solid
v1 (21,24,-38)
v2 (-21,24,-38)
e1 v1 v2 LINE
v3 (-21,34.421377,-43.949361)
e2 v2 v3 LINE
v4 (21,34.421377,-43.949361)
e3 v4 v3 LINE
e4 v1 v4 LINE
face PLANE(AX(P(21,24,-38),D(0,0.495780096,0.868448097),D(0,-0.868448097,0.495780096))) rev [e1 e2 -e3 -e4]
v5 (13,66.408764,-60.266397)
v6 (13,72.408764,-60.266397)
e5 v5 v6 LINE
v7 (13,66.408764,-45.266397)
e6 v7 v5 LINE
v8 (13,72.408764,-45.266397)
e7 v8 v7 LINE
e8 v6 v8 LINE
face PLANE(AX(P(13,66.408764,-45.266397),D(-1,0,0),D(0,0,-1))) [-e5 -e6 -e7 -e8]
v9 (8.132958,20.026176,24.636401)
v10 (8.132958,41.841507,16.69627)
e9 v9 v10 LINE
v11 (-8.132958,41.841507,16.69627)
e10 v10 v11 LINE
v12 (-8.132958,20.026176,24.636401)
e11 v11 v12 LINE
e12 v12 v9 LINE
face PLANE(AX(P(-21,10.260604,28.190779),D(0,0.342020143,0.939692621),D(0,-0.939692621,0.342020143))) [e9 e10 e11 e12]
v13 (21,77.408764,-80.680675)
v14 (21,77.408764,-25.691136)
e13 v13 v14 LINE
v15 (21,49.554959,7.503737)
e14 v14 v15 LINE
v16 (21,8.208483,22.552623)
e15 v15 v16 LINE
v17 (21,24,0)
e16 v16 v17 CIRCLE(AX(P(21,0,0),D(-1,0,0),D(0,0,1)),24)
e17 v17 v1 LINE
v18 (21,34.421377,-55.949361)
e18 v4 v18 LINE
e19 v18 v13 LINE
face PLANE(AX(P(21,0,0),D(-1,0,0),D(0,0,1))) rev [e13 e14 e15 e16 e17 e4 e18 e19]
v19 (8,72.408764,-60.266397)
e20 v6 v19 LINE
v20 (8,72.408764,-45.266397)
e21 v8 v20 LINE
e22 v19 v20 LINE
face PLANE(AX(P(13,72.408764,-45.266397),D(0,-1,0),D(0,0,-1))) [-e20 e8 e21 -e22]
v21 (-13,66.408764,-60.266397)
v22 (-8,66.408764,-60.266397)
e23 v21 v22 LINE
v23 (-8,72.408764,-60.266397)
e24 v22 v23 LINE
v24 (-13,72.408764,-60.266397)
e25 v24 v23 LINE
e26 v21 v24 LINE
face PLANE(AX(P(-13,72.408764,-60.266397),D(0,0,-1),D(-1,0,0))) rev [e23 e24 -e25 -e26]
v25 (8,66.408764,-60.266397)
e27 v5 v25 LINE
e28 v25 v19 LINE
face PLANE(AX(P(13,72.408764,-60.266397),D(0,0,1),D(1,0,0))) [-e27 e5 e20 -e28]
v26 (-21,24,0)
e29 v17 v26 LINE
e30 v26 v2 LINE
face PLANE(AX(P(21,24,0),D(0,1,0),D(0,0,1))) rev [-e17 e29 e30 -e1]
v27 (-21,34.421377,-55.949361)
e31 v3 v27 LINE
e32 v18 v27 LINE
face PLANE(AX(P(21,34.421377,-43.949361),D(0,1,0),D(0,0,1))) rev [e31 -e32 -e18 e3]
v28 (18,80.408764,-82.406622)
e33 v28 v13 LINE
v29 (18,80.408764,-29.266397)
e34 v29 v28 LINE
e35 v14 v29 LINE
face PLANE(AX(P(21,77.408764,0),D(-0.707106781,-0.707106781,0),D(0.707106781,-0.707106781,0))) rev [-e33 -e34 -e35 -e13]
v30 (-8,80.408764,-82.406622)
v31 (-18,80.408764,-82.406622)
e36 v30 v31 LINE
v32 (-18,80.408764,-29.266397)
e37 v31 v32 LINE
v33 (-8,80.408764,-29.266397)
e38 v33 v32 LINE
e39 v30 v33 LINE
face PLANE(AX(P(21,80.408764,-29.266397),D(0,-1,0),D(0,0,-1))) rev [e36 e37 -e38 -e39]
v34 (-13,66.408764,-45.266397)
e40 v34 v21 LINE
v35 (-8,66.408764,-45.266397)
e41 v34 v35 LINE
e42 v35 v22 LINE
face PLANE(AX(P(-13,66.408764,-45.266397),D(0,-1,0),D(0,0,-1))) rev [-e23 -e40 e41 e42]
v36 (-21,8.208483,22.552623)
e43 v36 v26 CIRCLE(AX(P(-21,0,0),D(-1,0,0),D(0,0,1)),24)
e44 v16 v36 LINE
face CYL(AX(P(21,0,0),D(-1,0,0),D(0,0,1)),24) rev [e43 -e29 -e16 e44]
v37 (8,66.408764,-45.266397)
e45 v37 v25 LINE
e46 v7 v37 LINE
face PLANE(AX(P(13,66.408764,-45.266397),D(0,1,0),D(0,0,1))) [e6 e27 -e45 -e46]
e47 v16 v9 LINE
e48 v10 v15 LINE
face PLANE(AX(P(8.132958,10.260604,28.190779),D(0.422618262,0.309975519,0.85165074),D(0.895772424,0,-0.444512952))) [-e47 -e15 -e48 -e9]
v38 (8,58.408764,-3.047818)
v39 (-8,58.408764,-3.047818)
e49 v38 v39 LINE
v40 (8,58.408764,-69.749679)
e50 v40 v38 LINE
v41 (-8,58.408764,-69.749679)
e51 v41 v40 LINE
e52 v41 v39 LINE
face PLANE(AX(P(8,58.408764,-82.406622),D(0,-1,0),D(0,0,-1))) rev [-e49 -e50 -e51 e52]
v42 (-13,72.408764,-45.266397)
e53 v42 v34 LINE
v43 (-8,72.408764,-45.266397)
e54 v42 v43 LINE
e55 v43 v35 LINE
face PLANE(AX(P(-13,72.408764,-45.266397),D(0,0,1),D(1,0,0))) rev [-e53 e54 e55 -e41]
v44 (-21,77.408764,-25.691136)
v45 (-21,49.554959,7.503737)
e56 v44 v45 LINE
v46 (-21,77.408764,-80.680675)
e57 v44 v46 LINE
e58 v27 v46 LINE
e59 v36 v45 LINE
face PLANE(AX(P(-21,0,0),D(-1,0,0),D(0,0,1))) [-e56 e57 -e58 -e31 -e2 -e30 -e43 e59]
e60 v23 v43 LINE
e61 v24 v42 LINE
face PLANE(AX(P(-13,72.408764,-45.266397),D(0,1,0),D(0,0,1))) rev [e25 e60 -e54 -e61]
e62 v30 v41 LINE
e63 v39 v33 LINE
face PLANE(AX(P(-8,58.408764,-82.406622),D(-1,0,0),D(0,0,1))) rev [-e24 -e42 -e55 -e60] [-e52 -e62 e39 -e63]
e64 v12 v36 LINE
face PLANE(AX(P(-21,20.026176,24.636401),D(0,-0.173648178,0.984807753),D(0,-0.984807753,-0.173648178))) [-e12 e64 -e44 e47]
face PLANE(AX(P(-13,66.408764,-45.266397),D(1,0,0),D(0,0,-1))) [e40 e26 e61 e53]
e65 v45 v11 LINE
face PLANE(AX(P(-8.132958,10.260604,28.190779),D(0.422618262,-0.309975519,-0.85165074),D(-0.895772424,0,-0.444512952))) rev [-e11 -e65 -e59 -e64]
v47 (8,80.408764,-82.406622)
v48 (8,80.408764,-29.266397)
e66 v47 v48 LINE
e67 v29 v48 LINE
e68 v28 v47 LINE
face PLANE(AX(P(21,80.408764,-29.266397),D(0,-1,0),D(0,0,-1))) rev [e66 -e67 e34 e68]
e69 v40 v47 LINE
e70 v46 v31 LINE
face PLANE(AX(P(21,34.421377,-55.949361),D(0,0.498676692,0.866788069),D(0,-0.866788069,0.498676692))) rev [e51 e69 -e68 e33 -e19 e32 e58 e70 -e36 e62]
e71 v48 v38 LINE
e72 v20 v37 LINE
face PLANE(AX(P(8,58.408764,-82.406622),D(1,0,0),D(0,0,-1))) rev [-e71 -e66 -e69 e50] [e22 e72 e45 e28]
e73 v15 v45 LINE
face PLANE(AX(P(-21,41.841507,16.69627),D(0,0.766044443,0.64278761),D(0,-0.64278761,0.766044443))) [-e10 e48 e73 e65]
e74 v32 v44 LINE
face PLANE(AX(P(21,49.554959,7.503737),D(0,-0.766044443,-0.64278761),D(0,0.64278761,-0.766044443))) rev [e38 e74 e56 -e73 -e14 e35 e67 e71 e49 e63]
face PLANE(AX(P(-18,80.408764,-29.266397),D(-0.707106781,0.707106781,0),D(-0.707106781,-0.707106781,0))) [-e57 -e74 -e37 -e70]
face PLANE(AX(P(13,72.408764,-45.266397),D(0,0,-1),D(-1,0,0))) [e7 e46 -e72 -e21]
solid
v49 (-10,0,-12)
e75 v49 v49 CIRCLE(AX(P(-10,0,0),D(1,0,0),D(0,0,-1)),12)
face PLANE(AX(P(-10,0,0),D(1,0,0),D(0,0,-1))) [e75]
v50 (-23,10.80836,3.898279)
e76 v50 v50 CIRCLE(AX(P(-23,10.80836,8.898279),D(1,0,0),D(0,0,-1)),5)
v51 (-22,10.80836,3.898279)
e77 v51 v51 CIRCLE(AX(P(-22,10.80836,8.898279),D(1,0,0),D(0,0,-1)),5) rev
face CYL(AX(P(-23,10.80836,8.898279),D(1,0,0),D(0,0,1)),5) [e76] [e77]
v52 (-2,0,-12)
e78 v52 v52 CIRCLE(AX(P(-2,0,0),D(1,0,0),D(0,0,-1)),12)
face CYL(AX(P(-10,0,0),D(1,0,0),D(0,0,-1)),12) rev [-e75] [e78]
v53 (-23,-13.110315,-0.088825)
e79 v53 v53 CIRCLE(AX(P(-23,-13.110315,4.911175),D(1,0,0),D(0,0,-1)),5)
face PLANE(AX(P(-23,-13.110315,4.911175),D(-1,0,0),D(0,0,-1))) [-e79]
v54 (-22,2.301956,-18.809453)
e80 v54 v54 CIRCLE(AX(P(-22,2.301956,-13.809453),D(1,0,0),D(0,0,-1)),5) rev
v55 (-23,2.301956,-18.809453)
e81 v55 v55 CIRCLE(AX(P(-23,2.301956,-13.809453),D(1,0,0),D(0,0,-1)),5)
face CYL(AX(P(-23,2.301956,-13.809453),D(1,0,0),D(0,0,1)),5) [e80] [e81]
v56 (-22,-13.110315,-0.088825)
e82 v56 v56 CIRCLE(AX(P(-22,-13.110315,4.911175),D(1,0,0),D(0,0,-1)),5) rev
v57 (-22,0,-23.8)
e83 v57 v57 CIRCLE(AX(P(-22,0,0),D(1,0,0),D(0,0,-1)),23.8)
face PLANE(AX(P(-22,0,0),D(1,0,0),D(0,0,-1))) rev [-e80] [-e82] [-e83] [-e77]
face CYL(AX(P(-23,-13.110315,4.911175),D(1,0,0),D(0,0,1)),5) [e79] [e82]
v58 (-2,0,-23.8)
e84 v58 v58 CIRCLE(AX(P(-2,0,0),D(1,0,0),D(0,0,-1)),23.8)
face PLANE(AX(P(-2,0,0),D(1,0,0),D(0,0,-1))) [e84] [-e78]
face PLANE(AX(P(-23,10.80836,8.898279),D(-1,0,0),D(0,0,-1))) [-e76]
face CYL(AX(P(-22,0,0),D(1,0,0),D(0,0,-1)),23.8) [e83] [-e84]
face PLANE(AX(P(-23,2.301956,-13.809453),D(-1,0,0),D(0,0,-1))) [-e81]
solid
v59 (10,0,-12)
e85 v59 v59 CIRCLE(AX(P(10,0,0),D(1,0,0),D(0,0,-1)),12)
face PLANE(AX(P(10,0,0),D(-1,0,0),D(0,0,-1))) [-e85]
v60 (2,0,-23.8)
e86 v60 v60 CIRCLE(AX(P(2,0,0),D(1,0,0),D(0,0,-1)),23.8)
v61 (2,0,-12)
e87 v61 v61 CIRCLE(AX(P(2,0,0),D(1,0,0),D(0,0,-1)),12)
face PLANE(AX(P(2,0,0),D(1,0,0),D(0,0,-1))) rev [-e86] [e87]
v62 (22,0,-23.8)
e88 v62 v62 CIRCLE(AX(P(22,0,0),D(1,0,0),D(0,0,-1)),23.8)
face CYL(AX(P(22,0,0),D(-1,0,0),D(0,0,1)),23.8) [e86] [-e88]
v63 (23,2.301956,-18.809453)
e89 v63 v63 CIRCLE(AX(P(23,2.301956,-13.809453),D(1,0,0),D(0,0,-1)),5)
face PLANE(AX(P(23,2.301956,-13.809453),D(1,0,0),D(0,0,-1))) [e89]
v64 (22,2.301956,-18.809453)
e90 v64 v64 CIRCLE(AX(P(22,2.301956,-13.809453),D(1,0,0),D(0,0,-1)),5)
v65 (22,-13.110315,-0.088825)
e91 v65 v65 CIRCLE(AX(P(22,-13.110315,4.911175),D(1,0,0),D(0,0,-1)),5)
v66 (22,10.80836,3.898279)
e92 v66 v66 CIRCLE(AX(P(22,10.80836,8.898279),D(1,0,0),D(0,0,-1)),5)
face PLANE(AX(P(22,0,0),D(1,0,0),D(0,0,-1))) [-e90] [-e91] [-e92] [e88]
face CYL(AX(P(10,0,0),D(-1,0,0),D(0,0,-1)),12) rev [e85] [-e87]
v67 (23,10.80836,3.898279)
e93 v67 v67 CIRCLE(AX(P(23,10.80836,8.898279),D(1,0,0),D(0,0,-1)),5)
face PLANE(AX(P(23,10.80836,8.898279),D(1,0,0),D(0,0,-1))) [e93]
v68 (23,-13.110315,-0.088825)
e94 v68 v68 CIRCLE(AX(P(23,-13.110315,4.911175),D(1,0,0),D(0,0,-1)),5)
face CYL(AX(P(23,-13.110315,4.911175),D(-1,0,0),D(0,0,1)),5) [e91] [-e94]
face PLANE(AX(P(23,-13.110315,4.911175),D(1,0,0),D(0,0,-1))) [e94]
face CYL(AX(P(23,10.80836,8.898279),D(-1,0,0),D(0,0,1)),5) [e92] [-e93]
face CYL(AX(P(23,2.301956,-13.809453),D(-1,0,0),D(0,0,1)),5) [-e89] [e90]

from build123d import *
from OCP.BRepFilletAPI import BRepFilletAPI_MakeChamfer

# Parameters (mm, degrees)
BOSS_EXTRUDE1_START = 1
SKETCH1_R           = 11.9
BOSS_EXTRUDE1_DEPTH = 10
BOSS_EXTRUDE2_START = -1
SKETCH1_2_R         = 11.9
BOSS_EXTRUDE2_DEPTH = 10
SKETCH2_R           = 6
CUT_EXTRUDE1_DEPTH  = 4
BOSS_EXTRUDE3_DEPTH = 10.5
SKETCH4_W           = 21
SKETCH4_H           = 22
BOSS_EXTRUDE4_DEPTH = 3
CHAMFER1_SIZE       = 5.196152423
CHAMFER1_SIZE_2     = 3
CHAMFER2_SIZE       = 3
CHAMFER2_SIZE2      = 6.433520762
SKETCH5_R           = 2.5
BOSS_EXTRUDE5_DEPTH = 0.5
SKETCH7_W           = 8
SKETCH7_H           = 11
CUT_EXTRUDE2_DEPTH  = 59.705665531
CHAMFER3_SIZE       = 1.5
SCALE2_SCALE        = 2
SKETCH9_W           = 15
SKETCH9_H           = 6
CUT_EXTRUDE3_DEPTH  = 5


with BuildPart() as part:
    # Sketch1 → Boss-Extrude1 (new body)
    with BuildSketch(Plane(origin=(0, 0, 0), x_dir=(0, 0, -1), z_dir=(1, 0, 0)).offset(BOSS_EXTRUDE1_START)):
        Circle(SKETCH1_R)
    extrude(amount=BOSS_EXTRUDE1_DEPTH)


with BuildPart() as body_2:
    # Sketch1<2> → Boss-Extrude2 (new body)
    with BuildSketch(Plane(origin=(0, 0, 0), x_dir=(0, 0, -1), z_dir=(1, 0, 0)).offset(BOSS_EXTRUDE2_START)):
        Circle(SKETCH1_2_R)
    extrude(amount=-BOSS_EXTRUDE2_DEPTH)

    # Sketch2 → Cut-Extrude1 (cut)
    with BuildSketch(Plane(origin=(-1, 0, 0), x_dir=(0, 0, -1), z_dir=(1, 0, 0))):
        Circle(SKETCH2_R)
    cut_extrude1 = extrude(amount=-CUT_EXTRUDE1_DEPTH, mode=Mode.SUBTRACT)


with BuildPart() as part_1:
    add(part.part)

    # Mirror1: Cut-Extrude1 across plane
    add(cut_extrude1.mirror(Plane(origin=(0, 0, 0), x_dir=(0, 0, 1), z_dir=(1, 0, 0))), mode=Mode.SUBTRACT)

    # Sketch5 → Boss-Extrude5 (add)
    with BuildSketch(Plane(origin=(11, 0, 0), x_dir=(0, 0, -1), z_dir=(1, 0, 0))):
        with Locations((-4.449139328, 5.404179793)):
            Circle(SKETCH5_R)
        with Locations((6.904726652, 1.150977786)):
            Circle(SKETCH5_R)
        with Locations((-2.455587324, -6.55515758)):
            Circle(SKETCH5_R)
    boss_extrude5 = extrude(amount=BOSS_EXTRUDE5_DEPTH)


with BuildPart() as body_3:
    # Sketch3 → Boss-Extrude3 (new, symmetric)
    with BuildSketch(Plane(origin=(0, 0, 0), x_dir=(0, 0, -1), z_dir=(1, 0, 0))):
        with BuildLine():
            Line((0, 12), (19, 12))
            Line((19, 12), (21.974680573, 17.210688581))
            Line((21.974680573, 17.210688581), (27.974680573, 17.210688581))
            Line((27.974680573, 17.210688581), (41.203310943, 40.20438201))
            Line((41.203310943, 40.20438201), (14.633198339, 40.20438201))
            Line((14.633198339, 40.20438201), (-3.751868296, 24.777479377))
            Line((-3.751868296, 24.777479377), (-11.276311449, 4.10424172))
            ThreePointArc((-11.276311449, 4.10424172), (-6.882917236, 9.829824531), (0, 12))
        make_face()
    extrude(amount=BOSS_EXTRUDE3_DEPTH, both=True)

    # Sketch4 → Boss-Extrude4 (add)
    with BuildSketch(Plane(origin=(0, 4.10424172, 11.276311449), x_dir=(1, 0, 0), z_dir=(0, 0.34202014332566527, 0.9396926207859096))):
        with Locations((0, 11)):
            Rectangle(SKETCH4_W, SKETCH4_H)
    extrude(amount=BOSS_EXTRUDE4_DEPTH)

    # Chamfer1
    chamfer1_edges_1 = [body_3.edges().sort_by_distance(p)[0] for p in [
        (0, 25.803539807, 6.570946159),
    ]]
    chamfer1_side_1 = [body_3.faces().sort_by_distance(p)[0] for p in [
        (0, 25.74715825, 6.591467367),
    ]]
    chamfer1_edges_2 = [body_3.edges().sort_by_distance(p)[0] for p in [
        (0, 5.13030215, 14.095389312),
    ]]
    chamfer1_side_2 = [body_3.faces().sort_by_distance(p)[0] for p in [
        (0, 5.109780941, 14.039007755),
    ]]
    chamfer1 = BRepFilletAPI_MakeChamfer(body_3.part.solid().wrapped)
    for e in chamfer1_edges_1:
        chamfer1.Add(CHAMFER1_SIZE - 0.0001, CHAMFER1_SIZE_2 - 0.0001, e.wrapped, chamfer1_side_1[0].wrapped)
    for e in chamfer1_edges_2:
        chamfer1.Add(CHAMFER1_SIZE_2 - 0.0001, CHAMFER1_SIZE - 0.0001, e.wrapped, chamfer1_side_2[0].wrapped)
    add(Compound.cast(chamfer1.Shape()), mode=Mode.REPLACE)  # a hair under: the kernel refuses the full size

    # Chamfer2: one chamfer whose edges measure the first distance from different faces: ONE call of the kernel's chamfer builder (chamfer() names one face for all edges)
    chamfer2_edges_1 = [body_3.edges().sort_by_distance(p)[0] for p in [
        (10.5, 15.466920979, 10.333167735),
    ]]
    chamfer2_side_1 = [body_3.faces().sort_by_distance(p)[0] for p in [
        (10.5, 25.167414296, -14.377800232),
    ]]
    chamfer2_edges_2 = [body_3.edges().sort_by_distance(p)[0] for p in [
        (-10.5, 15.466920979, 10.333167735),
    ]]
    chamfer2_side_2 = [body_3.faces().sort_by_distance(p)[0] for p in [
        (-10.5, 25.167414296, -14.377800232),
    ]]
    chamfer2 = BRepFilletAPI_MakeChamfer(body_3.part.solid().wrapped)
    for e in chamfer2_edges_1:
        chamfer2.Add(CHAMFER2_SIZE, CHAMFER2_SIZE2, e.wrapped, chamfer2_side_1[0].wrapped)  # the first distance lies on this face
    for e in chamfer2_edges_2:
        chamfer2.Add(CHAMFER2_SIZE, CHAMFER2_SIZE2, e.wrapped, chamfer2_side_2[0].wrapped)  # the first distance lies on this face
    add(Compound.cast(chamfer2.Shape()), mode=Mode.REPLACE)

    # Sketch7 → Cut-Extrude2 (cut, through all)
    with BuildSketch(Plane.XY):
        with Locations((0, 34.70438201)):
            Rectangle(SKETCH7_W, SKETCH7_H)
    extrude(amount=-CUT_EXTRUDE2_DEPTH, mode=Mode.SUBTRACT)

    # Chamfer3
    chamfer3_edges = [body_3.edges().sort_by_distance(p)[0] for p in [
        (10.5, 40.20438201, -27.918254641),
        (-10.5, 40.20438201, -27.918254641),
    ]]
    chamfer(chamfer3_edges, length=CHAMFER3_SIZE)


with BuildPart() as body_2_1:
    add(body_2.part)

    # Mirror2: Boss-Extrude5 across plane
    add(boss_extrude5.mirror(Plane(origin=(0, 0, 0), x_dir=(0, 0, 1), z_dir=(1, 0, 0))))


with BuildPart() as body_2_2:
    # Scale2: scaled about (0, 0, 0)
    add(body_2_1.part.scale(SCALE2_SCALE))


with BuildPart() as body_3_1:
    # Scale2: scaled about (0, 0, 0)
    add(body_3.part.scale(SCALE2_SCALE))

    # Sketch9 → Cut-Extrude3 (cut)
    with BuildSketch(Plane(origin=(-8, 0, 0), x_dir=(0, 0, -1), z_dir=(1, 0, 0))):
        with Locations((52.766396677, 69.408764019)):
            Rectangle(SKETCH9_W, SKETCH9_H)
    cut_extrude3 = extrude(amount=-CUT_EXTRUDE3_DEPTH, mode=Mode.SUBTRACT)

    # Mirror3: Cut-Extrude3 across plane
    add(cut_extrude3.mirror(Plane(origin=(0, 0, 0), x_dir=(0, 0, 1), z_dir=(1, 0, 0))), mode=Mode.SUBTRACT)


with BuildPart() as part_2:
    # Scale2: scaled about (0, 0, 0)
    add(part_1.part.scale(SCALE2_SCALE))


solid = Compound([body_2_2.part, body_3_1.part, part_2.part])
